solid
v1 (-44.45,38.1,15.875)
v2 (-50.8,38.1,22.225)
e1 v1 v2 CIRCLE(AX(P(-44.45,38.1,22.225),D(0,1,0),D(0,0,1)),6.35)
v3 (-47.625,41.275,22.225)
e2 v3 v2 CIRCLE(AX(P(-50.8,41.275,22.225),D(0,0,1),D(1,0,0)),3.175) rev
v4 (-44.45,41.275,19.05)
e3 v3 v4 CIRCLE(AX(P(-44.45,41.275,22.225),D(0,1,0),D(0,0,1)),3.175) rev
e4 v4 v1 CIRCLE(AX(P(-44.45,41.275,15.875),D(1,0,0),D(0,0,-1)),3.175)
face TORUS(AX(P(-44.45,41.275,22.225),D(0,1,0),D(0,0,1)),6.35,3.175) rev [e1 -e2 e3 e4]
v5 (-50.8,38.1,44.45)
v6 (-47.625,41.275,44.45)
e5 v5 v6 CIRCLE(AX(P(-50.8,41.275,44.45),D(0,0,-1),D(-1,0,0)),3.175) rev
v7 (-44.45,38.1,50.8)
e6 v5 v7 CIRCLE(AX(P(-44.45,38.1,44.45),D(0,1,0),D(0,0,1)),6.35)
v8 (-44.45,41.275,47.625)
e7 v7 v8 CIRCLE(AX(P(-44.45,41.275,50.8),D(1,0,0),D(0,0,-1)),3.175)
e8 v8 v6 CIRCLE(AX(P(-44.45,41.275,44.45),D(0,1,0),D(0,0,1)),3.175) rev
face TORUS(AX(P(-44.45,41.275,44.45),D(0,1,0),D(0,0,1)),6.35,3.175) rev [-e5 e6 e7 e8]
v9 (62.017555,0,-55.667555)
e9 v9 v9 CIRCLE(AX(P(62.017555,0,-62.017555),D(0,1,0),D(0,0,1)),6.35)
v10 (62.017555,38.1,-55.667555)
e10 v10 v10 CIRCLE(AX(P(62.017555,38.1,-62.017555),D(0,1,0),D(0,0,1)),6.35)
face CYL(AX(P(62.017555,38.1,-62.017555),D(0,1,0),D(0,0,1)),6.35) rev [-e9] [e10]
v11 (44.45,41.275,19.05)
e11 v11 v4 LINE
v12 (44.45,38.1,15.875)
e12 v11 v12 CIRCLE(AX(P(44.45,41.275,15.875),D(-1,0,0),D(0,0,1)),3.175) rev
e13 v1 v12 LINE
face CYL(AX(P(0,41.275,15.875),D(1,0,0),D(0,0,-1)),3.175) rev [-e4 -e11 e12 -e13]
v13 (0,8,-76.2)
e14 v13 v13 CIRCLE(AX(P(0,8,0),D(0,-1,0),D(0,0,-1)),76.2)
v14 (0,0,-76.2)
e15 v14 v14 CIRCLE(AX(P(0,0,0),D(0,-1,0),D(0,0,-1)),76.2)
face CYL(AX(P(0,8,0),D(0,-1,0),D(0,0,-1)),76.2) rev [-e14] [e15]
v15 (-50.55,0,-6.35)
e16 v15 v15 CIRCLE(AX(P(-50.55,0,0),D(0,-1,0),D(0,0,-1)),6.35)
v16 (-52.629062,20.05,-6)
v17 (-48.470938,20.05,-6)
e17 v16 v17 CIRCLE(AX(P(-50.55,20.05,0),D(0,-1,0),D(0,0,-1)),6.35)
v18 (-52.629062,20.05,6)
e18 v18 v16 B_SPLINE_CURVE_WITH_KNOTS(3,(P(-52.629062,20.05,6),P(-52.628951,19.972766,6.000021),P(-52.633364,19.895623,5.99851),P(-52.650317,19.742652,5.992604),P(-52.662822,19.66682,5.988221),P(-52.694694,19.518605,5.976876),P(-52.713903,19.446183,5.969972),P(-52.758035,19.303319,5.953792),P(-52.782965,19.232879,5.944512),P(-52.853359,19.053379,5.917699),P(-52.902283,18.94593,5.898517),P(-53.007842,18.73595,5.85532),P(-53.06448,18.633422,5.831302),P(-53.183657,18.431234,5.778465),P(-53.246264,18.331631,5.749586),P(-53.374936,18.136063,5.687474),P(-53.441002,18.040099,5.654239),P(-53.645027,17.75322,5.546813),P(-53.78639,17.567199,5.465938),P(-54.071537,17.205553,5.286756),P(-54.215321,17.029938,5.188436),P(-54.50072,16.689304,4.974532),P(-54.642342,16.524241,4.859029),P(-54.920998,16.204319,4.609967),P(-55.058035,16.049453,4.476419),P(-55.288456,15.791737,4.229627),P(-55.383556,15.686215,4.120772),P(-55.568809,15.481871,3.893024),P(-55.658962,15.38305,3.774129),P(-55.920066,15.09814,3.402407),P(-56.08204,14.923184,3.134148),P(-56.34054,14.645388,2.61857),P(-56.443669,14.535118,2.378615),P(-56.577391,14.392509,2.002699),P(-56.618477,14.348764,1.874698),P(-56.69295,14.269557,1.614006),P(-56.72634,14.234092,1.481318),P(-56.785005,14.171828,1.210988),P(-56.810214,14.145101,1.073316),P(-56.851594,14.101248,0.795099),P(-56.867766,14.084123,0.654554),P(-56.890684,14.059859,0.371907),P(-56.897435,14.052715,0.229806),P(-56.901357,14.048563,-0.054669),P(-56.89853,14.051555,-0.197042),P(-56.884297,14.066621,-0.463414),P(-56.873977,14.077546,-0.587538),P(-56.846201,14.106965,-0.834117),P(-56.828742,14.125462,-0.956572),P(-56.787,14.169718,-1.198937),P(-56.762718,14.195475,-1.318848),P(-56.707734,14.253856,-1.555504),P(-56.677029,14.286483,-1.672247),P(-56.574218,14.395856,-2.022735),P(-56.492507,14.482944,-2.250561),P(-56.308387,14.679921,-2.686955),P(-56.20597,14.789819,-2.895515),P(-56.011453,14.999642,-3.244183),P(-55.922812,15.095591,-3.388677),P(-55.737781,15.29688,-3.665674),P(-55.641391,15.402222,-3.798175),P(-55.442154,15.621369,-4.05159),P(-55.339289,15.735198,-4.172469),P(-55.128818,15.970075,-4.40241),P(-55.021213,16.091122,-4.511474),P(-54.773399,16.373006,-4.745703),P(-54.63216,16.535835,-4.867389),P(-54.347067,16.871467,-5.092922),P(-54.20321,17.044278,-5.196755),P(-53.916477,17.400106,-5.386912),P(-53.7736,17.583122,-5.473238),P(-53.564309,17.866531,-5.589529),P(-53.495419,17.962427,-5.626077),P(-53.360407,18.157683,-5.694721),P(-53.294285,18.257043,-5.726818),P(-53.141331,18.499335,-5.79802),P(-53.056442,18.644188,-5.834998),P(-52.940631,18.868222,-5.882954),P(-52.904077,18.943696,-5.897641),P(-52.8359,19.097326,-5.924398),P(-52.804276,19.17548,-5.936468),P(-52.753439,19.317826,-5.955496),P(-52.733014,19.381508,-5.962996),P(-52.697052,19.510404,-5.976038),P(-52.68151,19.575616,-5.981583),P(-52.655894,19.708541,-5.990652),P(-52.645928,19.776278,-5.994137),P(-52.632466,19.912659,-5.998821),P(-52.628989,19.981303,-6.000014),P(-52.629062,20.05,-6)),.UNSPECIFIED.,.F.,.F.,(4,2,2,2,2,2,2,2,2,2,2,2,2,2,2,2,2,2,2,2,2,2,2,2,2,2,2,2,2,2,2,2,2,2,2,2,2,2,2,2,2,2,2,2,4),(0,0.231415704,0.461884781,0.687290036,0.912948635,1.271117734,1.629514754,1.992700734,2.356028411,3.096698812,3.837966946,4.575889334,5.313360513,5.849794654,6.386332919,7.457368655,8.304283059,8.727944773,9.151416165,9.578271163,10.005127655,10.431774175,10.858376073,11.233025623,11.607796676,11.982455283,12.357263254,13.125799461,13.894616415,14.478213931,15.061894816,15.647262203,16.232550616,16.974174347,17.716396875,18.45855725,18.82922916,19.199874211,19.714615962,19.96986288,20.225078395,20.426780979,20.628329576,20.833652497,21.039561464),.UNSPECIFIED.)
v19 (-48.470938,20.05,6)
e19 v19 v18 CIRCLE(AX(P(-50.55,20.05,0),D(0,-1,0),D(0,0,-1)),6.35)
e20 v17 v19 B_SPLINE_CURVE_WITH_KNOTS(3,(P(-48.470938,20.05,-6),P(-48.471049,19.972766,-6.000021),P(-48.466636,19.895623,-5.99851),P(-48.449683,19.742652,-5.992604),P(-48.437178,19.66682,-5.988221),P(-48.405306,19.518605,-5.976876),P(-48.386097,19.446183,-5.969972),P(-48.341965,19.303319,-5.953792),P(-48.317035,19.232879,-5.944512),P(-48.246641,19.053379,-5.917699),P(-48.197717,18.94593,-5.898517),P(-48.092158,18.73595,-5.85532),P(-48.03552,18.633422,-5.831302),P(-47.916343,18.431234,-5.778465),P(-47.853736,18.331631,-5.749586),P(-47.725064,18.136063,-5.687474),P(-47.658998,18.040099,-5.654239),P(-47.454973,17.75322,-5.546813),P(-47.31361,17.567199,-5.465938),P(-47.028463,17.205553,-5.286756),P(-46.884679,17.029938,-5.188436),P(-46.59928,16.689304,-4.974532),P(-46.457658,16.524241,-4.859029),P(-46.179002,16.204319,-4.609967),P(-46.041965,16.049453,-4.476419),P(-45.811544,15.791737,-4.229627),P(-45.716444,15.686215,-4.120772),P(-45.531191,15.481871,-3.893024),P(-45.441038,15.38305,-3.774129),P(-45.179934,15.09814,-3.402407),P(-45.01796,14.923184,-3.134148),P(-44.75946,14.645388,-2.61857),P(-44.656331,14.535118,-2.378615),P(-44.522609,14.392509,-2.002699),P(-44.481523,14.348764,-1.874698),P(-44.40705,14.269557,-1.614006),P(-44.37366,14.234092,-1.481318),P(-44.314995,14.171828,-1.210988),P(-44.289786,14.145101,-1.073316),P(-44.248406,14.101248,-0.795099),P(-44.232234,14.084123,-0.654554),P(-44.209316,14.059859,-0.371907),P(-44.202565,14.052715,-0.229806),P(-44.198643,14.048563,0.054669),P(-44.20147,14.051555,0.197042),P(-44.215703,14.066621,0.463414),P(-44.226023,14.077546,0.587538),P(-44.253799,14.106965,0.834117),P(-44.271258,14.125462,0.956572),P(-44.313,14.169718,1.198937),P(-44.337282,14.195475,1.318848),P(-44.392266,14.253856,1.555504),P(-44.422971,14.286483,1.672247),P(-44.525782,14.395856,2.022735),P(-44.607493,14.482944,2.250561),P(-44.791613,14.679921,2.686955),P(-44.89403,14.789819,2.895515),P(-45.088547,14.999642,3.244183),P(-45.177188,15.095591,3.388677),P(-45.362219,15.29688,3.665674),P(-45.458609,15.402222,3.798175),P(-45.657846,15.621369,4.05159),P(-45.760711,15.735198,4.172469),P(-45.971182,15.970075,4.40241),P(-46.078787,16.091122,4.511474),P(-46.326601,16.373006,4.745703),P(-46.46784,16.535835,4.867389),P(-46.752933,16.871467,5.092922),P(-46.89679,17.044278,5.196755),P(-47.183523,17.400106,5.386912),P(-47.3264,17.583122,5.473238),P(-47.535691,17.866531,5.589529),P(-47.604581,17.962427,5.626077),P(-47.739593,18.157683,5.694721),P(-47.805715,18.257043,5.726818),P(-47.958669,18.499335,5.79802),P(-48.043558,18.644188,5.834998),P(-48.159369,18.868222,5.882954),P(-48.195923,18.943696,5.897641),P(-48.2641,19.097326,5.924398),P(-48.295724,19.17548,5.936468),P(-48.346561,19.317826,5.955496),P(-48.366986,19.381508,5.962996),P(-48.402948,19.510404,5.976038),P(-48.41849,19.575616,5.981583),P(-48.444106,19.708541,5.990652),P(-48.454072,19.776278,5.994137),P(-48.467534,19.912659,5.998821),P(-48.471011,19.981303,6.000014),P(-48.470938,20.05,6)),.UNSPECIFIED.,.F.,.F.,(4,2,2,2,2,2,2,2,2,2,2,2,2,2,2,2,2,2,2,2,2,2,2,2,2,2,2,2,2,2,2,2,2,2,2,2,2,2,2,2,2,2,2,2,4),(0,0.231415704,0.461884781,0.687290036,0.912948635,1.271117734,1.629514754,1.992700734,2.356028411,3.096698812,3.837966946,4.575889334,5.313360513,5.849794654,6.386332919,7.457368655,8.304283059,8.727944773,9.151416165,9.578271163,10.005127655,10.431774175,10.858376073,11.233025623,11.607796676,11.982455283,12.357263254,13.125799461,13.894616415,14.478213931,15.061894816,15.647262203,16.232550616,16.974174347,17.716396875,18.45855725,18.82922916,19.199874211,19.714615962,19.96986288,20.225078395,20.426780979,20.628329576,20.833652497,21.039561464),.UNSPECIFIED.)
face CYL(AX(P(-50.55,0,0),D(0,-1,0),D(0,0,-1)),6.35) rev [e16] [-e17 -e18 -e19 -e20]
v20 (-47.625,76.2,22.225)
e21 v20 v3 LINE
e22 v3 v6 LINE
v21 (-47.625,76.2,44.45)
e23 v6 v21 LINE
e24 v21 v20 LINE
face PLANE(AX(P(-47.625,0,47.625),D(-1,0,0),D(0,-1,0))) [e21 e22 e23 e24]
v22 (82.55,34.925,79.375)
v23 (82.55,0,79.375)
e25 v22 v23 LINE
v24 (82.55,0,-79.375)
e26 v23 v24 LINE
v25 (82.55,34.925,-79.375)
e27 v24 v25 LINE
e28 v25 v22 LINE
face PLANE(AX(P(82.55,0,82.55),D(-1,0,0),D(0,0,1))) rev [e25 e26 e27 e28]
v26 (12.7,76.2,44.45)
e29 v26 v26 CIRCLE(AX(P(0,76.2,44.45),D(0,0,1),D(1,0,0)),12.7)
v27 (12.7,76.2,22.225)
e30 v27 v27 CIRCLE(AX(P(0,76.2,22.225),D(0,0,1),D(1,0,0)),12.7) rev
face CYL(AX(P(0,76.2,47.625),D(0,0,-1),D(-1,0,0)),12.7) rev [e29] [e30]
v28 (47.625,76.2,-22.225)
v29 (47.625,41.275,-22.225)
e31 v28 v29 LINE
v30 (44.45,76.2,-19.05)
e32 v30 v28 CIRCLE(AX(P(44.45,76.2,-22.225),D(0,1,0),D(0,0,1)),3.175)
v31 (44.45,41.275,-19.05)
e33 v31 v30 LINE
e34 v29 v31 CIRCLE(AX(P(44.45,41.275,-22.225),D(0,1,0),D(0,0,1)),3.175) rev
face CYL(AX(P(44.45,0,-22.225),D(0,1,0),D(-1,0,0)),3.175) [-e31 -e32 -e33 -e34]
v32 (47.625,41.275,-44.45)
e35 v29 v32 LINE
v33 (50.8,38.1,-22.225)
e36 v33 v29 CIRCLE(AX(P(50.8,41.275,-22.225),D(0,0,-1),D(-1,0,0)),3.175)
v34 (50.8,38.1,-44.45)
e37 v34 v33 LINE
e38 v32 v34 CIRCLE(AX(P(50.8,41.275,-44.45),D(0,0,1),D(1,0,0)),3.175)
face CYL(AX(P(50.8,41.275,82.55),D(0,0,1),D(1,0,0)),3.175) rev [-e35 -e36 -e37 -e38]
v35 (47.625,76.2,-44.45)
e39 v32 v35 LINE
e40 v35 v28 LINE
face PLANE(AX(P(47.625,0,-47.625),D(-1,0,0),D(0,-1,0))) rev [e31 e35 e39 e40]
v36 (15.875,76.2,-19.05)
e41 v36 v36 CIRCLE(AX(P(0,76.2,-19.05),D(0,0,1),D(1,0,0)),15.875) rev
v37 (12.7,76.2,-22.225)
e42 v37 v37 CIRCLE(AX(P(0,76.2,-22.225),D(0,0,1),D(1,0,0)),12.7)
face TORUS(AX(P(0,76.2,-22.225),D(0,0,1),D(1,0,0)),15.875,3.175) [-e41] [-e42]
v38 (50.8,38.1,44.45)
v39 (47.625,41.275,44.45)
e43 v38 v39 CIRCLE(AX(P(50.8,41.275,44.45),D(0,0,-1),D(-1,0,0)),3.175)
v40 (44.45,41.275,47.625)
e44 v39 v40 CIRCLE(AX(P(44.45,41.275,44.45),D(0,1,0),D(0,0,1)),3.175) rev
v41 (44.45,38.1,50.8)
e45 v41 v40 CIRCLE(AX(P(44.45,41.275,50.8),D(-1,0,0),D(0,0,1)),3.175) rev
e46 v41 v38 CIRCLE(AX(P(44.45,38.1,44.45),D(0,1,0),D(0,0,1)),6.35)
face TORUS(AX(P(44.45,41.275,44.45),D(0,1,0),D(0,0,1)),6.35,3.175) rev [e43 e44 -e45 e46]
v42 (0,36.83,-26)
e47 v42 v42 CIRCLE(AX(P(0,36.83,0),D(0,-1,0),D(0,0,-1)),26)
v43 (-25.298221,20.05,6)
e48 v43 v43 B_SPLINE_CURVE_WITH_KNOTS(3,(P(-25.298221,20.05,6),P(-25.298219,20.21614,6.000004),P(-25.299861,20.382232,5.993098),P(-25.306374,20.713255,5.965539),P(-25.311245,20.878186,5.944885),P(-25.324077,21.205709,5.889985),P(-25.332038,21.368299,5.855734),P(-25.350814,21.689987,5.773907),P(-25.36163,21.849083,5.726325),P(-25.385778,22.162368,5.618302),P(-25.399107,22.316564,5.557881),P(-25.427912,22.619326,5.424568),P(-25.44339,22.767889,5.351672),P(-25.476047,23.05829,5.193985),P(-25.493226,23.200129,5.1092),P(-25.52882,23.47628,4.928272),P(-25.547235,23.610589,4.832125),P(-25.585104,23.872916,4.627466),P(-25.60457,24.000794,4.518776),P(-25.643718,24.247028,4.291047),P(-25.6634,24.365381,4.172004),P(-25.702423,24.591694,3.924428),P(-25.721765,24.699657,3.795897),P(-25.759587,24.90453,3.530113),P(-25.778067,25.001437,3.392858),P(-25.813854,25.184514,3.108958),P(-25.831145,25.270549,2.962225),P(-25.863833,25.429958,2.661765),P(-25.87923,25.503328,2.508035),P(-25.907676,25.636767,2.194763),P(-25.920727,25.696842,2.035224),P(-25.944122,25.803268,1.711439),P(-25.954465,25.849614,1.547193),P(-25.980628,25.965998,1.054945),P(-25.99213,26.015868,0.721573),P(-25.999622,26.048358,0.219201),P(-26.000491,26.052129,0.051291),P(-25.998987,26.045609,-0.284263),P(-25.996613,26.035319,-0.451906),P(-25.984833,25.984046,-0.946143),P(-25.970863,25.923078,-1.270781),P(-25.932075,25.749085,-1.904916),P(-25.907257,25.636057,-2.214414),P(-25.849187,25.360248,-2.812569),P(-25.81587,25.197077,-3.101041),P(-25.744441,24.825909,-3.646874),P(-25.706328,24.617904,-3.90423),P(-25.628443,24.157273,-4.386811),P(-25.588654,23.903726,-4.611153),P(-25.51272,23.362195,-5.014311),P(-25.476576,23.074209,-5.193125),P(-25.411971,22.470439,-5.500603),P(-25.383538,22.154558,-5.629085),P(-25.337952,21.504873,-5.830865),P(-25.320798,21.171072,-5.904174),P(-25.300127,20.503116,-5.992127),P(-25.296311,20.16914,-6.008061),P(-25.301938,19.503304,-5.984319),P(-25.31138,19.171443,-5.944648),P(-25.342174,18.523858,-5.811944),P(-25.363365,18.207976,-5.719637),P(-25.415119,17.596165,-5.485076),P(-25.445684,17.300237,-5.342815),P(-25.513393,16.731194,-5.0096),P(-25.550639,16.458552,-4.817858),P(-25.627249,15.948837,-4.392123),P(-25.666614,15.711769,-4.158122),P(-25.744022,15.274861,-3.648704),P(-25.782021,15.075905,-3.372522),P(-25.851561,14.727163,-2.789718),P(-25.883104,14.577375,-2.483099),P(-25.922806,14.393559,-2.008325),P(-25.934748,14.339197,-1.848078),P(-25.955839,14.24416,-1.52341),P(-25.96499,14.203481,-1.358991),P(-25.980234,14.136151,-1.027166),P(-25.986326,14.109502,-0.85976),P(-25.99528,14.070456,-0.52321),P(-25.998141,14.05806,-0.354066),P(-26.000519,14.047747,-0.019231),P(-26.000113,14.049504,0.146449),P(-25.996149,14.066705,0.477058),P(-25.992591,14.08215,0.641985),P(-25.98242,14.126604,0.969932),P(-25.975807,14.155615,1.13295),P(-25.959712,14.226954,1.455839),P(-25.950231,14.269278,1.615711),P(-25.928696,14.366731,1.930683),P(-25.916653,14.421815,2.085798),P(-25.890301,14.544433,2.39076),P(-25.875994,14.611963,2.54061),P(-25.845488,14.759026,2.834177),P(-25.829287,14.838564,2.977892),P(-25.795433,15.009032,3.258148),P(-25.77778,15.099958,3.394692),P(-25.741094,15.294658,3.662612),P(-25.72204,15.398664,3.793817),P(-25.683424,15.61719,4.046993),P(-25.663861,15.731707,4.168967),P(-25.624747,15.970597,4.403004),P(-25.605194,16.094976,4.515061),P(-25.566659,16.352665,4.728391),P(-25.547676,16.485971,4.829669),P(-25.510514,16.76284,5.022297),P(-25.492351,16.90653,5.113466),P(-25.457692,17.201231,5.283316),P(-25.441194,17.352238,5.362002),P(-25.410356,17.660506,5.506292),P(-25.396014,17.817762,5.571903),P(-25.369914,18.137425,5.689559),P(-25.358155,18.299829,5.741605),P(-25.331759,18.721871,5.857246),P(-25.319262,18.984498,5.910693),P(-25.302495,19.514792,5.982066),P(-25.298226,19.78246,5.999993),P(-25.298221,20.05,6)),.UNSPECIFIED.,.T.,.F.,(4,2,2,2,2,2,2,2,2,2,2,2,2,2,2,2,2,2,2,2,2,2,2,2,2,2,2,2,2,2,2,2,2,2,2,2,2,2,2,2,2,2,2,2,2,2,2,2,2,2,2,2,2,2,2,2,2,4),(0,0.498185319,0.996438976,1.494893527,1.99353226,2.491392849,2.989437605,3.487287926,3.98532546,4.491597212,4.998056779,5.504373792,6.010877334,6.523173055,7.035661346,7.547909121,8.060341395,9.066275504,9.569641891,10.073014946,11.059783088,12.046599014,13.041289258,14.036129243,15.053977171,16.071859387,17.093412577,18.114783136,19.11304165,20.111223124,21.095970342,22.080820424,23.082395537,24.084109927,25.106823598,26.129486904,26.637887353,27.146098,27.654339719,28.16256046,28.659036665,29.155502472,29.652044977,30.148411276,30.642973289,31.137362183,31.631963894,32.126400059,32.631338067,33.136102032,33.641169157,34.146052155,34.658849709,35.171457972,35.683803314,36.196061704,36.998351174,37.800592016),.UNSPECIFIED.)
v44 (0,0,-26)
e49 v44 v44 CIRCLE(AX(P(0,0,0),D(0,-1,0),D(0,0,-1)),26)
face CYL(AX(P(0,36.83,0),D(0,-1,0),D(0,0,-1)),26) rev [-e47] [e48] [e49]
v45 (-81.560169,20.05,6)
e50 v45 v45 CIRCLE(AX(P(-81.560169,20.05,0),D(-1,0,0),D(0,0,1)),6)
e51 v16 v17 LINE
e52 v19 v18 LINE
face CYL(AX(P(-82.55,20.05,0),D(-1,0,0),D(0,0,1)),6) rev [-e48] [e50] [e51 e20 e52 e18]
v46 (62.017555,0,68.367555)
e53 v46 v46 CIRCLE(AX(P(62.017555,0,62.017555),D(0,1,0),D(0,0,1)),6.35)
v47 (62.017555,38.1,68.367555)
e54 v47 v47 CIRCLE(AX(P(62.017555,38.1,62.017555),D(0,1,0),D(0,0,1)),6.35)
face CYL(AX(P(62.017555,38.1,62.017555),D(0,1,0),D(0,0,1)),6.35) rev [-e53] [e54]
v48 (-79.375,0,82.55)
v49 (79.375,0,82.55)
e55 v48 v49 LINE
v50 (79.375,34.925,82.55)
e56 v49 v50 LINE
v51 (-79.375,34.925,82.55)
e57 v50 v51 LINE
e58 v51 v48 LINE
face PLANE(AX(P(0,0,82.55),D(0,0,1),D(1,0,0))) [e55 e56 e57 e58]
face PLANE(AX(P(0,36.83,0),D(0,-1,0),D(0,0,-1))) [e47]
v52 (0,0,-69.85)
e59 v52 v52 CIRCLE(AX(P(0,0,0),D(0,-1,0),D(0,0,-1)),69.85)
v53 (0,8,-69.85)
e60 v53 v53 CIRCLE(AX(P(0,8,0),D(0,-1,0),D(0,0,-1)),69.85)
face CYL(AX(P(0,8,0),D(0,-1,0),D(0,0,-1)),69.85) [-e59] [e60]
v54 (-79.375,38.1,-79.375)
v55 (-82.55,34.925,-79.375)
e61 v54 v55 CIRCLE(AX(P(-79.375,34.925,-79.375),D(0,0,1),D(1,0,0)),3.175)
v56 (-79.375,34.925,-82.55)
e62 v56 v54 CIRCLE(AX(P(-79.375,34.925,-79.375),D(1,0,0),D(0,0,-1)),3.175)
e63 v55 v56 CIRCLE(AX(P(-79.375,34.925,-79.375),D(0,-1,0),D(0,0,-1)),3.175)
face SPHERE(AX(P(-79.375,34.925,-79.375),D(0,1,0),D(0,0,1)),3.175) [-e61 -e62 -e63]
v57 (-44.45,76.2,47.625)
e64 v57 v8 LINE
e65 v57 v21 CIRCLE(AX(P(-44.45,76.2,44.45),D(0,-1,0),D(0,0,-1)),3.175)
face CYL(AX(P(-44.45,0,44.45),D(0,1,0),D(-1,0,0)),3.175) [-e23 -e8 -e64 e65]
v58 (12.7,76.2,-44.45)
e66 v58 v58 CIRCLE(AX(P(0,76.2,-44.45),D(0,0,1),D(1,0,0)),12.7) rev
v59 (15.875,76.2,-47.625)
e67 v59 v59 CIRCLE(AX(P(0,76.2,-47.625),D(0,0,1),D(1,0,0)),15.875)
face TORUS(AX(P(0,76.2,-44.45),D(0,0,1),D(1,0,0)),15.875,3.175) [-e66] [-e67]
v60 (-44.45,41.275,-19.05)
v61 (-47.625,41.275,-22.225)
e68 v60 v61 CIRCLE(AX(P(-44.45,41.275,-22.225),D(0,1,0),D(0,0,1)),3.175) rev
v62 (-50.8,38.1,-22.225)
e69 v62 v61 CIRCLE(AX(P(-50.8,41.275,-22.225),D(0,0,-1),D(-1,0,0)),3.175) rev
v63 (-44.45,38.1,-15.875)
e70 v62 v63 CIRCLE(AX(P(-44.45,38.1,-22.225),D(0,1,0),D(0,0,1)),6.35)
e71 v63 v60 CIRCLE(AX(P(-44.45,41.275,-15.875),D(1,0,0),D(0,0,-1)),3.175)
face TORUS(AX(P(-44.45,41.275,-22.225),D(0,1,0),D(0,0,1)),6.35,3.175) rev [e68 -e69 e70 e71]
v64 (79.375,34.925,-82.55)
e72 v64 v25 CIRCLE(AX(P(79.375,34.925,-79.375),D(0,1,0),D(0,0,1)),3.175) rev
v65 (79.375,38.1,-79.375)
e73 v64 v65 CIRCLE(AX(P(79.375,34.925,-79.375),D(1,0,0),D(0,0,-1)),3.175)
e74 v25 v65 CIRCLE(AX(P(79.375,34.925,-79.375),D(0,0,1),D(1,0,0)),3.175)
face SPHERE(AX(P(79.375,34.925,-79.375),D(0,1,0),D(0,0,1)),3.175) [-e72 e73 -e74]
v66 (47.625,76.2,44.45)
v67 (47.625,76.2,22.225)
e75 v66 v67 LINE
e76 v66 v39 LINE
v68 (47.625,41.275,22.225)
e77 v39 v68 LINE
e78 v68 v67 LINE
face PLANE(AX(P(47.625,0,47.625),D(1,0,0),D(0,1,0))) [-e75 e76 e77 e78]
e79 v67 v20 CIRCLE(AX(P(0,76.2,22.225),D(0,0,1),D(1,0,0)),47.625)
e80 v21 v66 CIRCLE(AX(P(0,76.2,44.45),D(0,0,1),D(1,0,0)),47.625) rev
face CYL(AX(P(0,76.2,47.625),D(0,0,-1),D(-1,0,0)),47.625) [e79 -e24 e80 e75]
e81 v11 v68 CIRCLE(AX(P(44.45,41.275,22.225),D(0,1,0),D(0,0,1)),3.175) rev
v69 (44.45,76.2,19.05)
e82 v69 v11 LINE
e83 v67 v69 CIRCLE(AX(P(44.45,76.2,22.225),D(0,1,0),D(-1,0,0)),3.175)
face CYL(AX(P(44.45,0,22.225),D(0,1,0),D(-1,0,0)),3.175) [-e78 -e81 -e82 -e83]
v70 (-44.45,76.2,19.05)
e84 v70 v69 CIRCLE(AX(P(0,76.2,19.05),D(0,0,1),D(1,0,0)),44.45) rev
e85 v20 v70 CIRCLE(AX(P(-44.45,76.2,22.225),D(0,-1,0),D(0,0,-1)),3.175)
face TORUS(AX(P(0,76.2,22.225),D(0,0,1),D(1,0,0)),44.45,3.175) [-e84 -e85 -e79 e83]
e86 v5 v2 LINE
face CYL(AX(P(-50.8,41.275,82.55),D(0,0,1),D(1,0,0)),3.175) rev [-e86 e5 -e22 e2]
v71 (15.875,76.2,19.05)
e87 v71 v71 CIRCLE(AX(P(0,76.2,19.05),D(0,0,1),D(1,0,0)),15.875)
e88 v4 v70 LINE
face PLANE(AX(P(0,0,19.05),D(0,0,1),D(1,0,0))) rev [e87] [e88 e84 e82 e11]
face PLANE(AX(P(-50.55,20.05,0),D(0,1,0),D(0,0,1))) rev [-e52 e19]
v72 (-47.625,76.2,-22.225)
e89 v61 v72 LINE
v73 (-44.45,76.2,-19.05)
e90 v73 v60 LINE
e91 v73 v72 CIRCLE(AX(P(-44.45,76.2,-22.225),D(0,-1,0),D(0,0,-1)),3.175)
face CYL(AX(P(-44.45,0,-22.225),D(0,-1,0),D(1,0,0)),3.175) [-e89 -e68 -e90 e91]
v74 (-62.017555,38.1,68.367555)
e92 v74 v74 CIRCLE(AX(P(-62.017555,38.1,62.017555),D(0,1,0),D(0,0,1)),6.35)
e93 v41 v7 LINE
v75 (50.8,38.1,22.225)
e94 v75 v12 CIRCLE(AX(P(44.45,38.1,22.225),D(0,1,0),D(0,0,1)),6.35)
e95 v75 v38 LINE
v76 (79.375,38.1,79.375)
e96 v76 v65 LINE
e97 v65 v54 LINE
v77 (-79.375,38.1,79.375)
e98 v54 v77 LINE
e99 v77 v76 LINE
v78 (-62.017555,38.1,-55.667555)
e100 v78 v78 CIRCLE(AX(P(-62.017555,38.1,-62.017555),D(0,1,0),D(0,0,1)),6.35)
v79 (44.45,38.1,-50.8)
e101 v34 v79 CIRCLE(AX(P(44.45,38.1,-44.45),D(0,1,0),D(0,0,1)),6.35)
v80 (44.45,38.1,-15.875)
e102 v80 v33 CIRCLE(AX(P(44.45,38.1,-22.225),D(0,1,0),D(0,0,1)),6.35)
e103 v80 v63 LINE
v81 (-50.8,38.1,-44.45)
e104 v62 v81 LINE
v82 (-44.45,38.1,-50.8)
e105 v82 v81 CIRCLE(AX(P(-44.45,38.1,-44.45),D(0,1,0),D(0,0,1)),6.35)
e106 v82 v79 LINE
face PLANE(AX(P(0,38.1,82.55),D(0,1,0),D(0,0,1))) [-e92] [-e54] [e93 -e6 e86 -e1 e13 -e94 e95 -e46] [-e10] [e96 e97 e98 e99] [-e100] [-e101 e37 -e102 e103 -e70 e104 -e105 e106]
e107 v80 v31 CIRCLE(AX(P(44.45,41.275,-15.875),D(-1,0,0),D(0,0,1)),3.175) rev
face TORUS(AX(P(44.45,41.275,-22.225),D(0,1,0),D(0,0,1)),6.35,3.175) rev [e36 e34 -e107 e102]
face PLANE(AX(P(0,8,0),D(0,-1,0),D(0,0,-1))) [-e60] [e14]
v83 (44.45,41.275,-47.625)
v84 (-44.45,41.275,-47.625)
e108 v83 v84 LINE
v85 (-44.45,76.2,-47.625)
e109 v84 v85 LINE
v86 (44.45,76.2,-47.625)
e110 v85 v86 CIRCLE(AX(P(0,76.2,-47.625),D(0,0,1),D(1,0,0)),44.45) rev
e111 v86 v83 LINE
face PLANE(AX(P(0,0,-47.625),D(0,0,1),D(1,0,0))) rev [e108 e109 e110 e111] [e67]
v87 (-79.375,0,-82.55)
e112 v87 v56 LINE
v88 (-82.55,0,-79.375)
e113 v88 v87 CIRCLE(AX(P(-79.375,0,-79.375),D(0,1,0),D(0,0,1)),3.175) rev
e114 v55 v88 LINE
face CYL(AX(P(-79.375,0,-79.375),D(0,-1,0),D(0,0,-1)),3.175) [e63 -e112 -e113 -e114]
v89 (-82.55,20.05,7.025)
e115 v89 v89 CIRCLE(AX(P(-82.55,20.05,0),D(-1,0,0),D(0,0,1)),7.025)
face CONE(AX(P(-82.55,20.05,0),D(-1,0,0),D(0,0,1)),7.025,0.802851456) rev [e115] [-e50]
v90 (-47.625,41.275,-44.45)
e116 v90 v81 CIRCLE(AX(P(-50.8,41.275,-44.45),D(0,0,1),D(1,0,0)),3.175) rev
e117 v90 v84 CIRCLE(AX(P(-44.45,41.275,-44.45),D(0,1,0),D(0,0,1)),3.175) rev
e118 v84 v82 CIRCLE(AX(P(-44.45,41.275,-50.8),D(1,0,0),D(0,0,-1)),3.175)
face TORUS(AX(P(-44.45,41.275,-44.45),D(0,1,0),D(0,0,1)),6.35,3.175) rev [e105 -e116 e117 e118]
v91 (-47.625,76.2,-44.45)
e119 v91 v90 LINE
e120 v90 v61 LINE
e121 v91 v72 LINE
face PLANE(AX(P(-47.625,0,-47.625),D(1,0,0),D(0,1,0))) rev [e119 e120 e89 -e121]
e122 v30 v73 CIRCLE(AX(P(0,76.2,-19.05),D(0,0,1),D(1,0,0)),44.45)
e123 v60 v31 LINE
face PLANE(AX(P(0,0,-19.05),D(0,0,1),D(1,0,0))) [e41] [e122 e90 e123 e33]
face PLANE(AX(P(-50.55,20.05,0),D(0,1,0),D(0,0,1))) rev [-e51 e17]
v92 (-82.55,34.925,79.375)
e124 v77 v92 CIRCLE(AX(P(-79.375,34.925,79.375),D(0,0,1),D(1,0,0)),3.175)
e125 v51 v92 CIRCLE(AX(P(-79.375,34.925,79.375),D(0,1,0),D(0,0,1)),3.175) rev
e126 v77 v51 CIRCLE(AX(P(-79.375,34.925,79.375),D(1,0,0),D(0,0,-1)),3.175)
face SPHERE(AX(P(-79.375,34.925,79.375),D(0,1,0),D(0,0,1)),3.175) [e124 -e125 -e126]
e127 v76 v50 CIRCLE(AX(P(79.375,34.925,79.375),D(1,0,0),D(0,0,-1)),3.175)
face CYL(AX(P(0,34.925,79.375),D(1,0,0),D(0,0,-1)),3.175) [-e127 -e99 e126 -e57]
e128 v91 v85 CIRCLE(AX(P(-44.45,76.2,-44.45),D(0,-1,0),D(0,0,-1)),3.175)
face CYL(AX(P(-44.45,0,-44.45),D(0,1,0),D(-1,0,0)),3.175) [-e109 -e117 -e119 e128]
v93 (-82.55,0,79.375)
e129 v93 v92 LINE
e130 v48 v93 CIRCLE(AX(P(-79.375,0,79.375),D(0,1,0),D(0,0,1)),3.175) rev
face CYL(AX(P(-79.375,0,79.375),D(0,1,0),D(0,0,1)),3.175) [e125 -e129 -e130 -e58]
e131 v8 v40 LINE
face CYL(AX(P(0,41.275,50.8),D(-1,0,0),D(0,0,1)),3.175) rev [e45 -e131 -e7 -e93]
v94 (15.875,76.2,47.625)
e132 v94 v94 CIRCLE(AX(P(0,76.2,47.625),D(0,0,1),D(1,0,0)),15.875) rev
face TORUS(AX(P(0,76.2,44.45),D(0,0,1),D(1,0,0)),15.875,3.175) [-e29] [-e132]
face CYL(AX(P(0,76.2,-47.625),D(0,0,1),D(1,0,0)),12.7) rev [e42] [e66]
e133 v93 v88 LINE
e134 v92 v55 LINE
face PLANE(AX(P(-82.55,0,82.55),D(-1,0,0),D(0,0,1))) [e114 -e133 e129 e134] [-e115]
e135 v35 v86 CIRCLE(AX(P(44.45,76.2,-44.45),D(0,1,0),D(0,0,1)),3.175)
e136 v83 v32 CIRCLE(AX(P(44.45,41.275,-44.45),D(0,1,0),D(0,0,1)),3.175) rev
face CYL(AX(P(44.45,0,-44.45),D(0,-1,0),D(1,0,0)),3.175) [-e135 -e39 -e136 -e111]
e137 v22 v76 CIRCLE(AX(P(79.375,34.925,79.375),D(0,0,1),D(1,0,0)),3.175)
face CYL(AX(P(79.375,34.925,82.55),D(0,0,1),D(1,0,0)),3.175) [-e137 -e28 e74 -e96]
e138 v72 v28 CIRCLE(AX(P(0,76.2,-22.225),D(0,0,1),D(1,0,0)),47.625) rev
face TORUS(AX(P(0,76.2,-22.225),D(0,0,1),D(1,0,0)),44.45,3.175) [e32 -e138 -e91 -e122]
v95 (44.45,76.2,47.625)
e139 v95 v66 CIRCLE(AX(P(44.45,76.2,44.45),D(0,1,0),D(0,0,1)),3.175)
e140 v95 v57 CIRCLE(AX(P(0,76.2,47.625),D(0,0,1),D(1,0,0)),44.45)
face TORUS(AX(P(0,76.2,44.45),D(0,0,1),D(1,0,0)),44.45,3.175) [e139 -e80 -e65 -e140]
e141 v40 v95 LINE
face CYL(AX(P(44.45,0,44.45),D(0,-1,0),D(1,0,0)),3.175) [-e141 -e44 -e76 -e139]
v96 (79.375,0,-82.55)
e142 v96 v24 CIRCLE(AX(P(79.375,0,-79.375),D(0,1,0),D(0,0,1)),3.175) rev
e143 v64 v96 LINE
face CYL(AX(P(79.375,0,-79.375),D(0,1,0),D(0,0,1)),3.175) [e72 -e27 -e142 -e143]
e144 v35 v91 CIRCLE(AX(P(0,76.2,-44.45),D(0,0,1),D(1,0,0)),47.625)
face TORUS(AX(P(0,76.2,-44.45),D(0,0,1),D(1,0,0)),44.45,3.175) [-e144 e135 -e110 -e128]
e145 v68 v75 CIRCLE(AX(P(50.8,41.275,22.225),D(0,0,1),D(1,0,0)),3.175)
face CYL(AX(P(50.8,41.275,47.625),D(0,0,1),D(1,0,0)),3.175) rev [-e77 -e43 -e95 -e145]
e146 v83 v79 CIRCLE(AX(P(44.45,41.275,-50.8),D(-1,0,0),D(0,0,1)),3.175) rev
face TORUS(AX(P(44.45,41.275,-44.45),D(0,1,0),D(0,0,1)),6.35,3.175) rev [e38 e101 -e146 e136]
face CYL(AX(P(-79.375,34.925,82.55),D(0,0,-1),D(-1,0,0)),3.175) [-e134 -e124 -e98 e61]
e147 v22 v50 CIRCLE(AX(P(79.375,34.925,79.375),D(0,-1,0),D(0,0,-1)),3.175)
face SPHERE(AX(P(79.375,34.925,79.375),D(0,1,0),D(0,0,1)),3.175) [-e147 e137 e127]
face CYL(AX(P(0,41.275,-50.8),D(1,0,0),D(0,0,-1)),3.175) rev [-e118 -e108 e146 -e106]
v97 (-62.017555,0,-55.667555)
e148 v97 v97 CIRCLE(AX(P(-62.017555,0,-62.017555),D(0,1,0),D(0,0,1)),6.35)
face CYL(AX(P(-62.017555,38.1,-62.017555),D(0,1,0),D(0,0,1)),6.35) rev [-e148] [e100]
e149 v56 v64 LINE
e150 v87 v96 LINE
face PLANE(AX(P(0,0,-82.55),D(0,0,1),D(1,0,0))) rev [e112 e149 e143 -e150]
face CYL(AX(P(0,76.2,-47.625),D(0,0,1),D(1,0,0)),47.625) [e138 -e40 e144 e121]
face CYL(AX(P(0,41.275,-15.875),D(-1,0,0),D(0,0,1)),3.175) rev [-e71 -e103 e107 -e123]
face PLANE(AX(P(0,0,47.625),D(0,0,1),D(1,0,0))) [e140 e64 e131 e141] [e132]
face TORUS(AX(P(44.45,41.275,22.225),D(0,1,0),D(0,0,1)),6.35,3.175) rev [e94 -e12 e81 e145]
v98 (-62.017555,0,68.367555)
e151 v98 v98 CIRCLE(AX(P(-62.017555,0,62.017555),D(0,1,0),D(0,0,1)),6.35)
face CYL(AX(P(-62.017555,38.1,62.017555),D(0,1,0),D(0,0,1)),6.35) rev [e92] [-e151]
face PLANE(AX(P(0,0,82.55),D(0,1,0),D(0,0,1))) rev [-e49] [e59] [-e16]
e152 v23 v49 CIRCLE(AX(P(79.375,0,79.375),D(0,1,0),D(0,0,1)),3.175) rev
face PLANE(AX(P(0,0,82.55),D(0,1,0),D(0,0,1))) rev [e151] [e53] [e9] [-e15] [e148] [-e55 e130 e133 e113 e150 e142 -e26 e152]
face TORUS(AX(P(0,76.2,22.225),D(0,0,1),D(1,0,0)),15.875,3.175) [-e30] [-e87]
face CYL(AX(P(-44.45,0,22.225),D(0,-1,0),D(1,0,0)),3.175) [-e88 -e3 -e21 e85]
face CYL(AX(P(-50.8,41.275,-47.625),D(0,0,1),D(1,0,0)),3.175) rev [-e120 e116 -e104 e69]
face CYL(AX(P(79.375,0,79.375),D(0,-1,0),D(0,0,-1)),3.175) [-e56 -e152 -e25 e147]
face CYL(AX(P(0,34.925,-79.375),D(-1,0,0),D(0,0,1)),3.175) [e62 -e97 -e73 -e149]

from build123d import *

# Parameters (mm, degrees)
SKETCH1_W                     = 165.1
SKETCH1_H                     = 38.1
BOSS_EXTRUDE1_DEPTH           = 82.55
BOSS_EXTRUDE4_START           = -19.05
SKETCH1_6_R                   = 12.7
BOSS_EXTRUDE4_DEPTH           = 28.575
SKETCH2_R                     = 26
CUT_EXTRUDE1_DEPTH            = 36.83
SKETCH2_3_R                   = 76.2
SKETCH2_3_R_2                 = 69.85
CUT_EXTRUDE2_DEPTH            = 8
BOSS_EXTRUDE6_START           = 47.625
SKETCH1_10_R                  = 12.7
BOSS_EXTRUDE6_DEPTH           = 28.575
F_1_0MM_DOWEL_HOLE4_OUTLINE_R = 6.35
F_1_0MM_DOWEL_HOLE4_DEPTH     = 20.05
F_1_0MM_DOWEL_HOLE5_D         = 12.7
FILLET1_R                     = 3.175
FILLET2_R                     = 3.175


# Read off the part's stored shape, not the designer's step: M14x2.0 Tapped Hole2, Ø1.0mm Dowel Hole4
with BuildPart() as part:
    # Sketch1 → Boss-Extrude1 (new, symmetric)
    with BuildSketch(Plane.XY):
        with Locations((0, 19.05)):
            Rectangle(SKETCH1_W, SKETCH1_H)
    extrude(amount=BOSS_EXTRUDE1_DEPTH, both=True)

    # Sketch1<6> → Boss-Extrude4 (add)
    with BuildSketch(Plane.XY.offset(BOSS_EXTRUDE4_START)):
        with BuildLine():
            Line((-47.625, 76.2), (-47.625, 38.1))
            Line((-47.625, 38.1), (47.625, 38.1))
            Line((47.625, 38.1), (47.625, 76.2))
            ThreePointArc((47.625, 76.2), (0, 123.825), (-47.625, 76.2))
        make_face()
        with Locations((0, 76.2)):
            Circle(SKETCH1_6_R, mode=Mode.SUBTRACT)
    extrude(amount=-BOSS_EXTRUDE4_DEPTH)

    # Sketch2 → Cut-Extrude1 (cut)
    with BuildSketch(Plane.XZ):
        with Locations(Location((0, 0, 0), (0, 0, 270))):
            Circle(SKETCH2_R)
    extrude(amount=-CUT_EXTRUDE1_DEPTH, mode=Mode.SUBTRACT)

    # Sketch2<3> → Cut-Extrude2 (cut)
    with BuildSketch(Plane.XZ):
        with Locations(Location((0, 0, 0), (0, 0, 270))):
            Circle(SKETCH2_3_R)
        with Locations(Location((0, 0, 0), (0, 0, 270))):
            Circle(SKETCH2_3_R_2, mode=Mode.SUBTRACT)
    extrude(amount=-CUT_EXTRUDE2_DEPTH, mode=Mode.SUBTRACT)

    # Sketch1<10> → Boss-Extrude6 (add)
    with BuildSketch(Plane.XY.offset(BOSS_EXTRUDE6_START)):
        with BuildLine():
            Line((-47.625, 76.2), (-47.625, 38.1))
            Line((-47.625, 38.1), (47.625, 38.1))
            Line((47.625, 38.1), (47.625, 76.2))
            ThreePointArc((47.625, 76.2), (0, 123.825), (-47.625, 76.2))
        make_face()
        with Locations((0, 76.2)):
            Circle(SKETCH1_10_R, mode=Mode.SUBTRACT)
    extrude(amount=-BOSS_EXTRUDE6_DEPTH)

    # M14x2.0 Tapped Hole2 outline → M14x2.0 Tapped Hole2 (revolve, cut)
    with BuildSketch(Plane(origin=(0, 20.05, 0), x_dir=(0, 1, 0), z_dir=(0, 0, -1))):
        Polygon((6, -81.560169006), (6, -25.298065783), (0, -25.298065783), (0, -82.55), (7.025, -82.55), align=None)
    revolve(axis=Axis((0, 20.05, 0), (1, 0, 0)), mode=Mode.SUBTRACT)

    # Ø1.0mm Dowel Hole4 outline → Ø1.0mm Dowel Hole4 (cut)
    with BuildSketch(Plane(origin=(0, 0, 0), x_dir=(1, 0, 0), z_dir=(0, 1, 0))):
        with Locations((-50.55, 0)):
            Circle(F_1_0MM_DOWEL_HOLE4_OUTLINE_R)
    extrude(amount=F_1_0MM_DOWEL_HOLE4_DEPTH, mode=Mode.SUBTRACT)

    # Ø1.0mm Dowel Hole5 (through all)
    with Locations(Plane(origin=(0, 38.1, 0), x_dir=(1, 0, 0), z_dir=(0, 1, 0))):
        with Locations((-62.017554956, 62.017554956), (62.017554956, -62.017554956), (62.017554956, 62.017554956), (-62.017554956, -62.017554956)):
            Hole(F_1_0MM_DOWEL_HOLE5_D / 2)

    # Fillet1
    fillet1_edges = [part.edges().sort_by_distance(p)[0] for p in [
        (82.55, 19.05, 82.55),
        (-82.55, 19.05, 82.55),
        (-82.55, 19.05, -82.55),
        (82.55, 19.05, -82.55),
    ]]
    fillet(fillet1_edges, radius=FILLET1_R)

    # Fillet2
    fillet2_edges = [part.edges().sort_by_distance(p)[0] for p in [
        (0, 38.1, -82.55),
        (-82.55, 38.1, 0),
        (0, 38.1, 82.55),
        (82.55, 38.1, 0),
        (81.62006403, 38.1, 81.62006403),
        (81.62006403, 38.1, -81.62006403),
        (-81.62006403, 38.1, 81.62006403),
        (-81.62006403, 38.1, -81.62006403),
        (0, 123.825, -19.05),
        (47.625, 57.15, -19.05),
        (0, 38.1, -47.625),
        (47.625, 38.1, -33.3375),
        (-12.7, 76.2, -19.05),
        (-47.625, 57.15, -19.05),
        (-47.625, 38.1, -33.3375),
        (-12.7, 76.2, -47.625),
        (0, 123.825, -47.625),
        (47.625, 57.15, -47.625),
        (-47.625, 57.15, -47.625),
        (0, 38.1, -19.05),
        (0, 123.825, 47.625),
        (-47.625, 57.15, 47.625),
        (0, 38.1, 19.05),
        (-47.625, 38.1, 33.3375),
        (-12.7, 76.2, 47.625),
        (47.625, 57.15, 47.625),
        (47.625, 38.1, 33.3375),
        (0, 38.1, 47.625),
        (-12.7, 76.2, 19.05),
        (0, 123.825, 19.05),
        (47.625, 57.15, 19.05),
        (-47.625, 57.15, 19.05),
    ]]
    fillet(fillet2_edges, radius=FILLET2_R)


solid = part.part
